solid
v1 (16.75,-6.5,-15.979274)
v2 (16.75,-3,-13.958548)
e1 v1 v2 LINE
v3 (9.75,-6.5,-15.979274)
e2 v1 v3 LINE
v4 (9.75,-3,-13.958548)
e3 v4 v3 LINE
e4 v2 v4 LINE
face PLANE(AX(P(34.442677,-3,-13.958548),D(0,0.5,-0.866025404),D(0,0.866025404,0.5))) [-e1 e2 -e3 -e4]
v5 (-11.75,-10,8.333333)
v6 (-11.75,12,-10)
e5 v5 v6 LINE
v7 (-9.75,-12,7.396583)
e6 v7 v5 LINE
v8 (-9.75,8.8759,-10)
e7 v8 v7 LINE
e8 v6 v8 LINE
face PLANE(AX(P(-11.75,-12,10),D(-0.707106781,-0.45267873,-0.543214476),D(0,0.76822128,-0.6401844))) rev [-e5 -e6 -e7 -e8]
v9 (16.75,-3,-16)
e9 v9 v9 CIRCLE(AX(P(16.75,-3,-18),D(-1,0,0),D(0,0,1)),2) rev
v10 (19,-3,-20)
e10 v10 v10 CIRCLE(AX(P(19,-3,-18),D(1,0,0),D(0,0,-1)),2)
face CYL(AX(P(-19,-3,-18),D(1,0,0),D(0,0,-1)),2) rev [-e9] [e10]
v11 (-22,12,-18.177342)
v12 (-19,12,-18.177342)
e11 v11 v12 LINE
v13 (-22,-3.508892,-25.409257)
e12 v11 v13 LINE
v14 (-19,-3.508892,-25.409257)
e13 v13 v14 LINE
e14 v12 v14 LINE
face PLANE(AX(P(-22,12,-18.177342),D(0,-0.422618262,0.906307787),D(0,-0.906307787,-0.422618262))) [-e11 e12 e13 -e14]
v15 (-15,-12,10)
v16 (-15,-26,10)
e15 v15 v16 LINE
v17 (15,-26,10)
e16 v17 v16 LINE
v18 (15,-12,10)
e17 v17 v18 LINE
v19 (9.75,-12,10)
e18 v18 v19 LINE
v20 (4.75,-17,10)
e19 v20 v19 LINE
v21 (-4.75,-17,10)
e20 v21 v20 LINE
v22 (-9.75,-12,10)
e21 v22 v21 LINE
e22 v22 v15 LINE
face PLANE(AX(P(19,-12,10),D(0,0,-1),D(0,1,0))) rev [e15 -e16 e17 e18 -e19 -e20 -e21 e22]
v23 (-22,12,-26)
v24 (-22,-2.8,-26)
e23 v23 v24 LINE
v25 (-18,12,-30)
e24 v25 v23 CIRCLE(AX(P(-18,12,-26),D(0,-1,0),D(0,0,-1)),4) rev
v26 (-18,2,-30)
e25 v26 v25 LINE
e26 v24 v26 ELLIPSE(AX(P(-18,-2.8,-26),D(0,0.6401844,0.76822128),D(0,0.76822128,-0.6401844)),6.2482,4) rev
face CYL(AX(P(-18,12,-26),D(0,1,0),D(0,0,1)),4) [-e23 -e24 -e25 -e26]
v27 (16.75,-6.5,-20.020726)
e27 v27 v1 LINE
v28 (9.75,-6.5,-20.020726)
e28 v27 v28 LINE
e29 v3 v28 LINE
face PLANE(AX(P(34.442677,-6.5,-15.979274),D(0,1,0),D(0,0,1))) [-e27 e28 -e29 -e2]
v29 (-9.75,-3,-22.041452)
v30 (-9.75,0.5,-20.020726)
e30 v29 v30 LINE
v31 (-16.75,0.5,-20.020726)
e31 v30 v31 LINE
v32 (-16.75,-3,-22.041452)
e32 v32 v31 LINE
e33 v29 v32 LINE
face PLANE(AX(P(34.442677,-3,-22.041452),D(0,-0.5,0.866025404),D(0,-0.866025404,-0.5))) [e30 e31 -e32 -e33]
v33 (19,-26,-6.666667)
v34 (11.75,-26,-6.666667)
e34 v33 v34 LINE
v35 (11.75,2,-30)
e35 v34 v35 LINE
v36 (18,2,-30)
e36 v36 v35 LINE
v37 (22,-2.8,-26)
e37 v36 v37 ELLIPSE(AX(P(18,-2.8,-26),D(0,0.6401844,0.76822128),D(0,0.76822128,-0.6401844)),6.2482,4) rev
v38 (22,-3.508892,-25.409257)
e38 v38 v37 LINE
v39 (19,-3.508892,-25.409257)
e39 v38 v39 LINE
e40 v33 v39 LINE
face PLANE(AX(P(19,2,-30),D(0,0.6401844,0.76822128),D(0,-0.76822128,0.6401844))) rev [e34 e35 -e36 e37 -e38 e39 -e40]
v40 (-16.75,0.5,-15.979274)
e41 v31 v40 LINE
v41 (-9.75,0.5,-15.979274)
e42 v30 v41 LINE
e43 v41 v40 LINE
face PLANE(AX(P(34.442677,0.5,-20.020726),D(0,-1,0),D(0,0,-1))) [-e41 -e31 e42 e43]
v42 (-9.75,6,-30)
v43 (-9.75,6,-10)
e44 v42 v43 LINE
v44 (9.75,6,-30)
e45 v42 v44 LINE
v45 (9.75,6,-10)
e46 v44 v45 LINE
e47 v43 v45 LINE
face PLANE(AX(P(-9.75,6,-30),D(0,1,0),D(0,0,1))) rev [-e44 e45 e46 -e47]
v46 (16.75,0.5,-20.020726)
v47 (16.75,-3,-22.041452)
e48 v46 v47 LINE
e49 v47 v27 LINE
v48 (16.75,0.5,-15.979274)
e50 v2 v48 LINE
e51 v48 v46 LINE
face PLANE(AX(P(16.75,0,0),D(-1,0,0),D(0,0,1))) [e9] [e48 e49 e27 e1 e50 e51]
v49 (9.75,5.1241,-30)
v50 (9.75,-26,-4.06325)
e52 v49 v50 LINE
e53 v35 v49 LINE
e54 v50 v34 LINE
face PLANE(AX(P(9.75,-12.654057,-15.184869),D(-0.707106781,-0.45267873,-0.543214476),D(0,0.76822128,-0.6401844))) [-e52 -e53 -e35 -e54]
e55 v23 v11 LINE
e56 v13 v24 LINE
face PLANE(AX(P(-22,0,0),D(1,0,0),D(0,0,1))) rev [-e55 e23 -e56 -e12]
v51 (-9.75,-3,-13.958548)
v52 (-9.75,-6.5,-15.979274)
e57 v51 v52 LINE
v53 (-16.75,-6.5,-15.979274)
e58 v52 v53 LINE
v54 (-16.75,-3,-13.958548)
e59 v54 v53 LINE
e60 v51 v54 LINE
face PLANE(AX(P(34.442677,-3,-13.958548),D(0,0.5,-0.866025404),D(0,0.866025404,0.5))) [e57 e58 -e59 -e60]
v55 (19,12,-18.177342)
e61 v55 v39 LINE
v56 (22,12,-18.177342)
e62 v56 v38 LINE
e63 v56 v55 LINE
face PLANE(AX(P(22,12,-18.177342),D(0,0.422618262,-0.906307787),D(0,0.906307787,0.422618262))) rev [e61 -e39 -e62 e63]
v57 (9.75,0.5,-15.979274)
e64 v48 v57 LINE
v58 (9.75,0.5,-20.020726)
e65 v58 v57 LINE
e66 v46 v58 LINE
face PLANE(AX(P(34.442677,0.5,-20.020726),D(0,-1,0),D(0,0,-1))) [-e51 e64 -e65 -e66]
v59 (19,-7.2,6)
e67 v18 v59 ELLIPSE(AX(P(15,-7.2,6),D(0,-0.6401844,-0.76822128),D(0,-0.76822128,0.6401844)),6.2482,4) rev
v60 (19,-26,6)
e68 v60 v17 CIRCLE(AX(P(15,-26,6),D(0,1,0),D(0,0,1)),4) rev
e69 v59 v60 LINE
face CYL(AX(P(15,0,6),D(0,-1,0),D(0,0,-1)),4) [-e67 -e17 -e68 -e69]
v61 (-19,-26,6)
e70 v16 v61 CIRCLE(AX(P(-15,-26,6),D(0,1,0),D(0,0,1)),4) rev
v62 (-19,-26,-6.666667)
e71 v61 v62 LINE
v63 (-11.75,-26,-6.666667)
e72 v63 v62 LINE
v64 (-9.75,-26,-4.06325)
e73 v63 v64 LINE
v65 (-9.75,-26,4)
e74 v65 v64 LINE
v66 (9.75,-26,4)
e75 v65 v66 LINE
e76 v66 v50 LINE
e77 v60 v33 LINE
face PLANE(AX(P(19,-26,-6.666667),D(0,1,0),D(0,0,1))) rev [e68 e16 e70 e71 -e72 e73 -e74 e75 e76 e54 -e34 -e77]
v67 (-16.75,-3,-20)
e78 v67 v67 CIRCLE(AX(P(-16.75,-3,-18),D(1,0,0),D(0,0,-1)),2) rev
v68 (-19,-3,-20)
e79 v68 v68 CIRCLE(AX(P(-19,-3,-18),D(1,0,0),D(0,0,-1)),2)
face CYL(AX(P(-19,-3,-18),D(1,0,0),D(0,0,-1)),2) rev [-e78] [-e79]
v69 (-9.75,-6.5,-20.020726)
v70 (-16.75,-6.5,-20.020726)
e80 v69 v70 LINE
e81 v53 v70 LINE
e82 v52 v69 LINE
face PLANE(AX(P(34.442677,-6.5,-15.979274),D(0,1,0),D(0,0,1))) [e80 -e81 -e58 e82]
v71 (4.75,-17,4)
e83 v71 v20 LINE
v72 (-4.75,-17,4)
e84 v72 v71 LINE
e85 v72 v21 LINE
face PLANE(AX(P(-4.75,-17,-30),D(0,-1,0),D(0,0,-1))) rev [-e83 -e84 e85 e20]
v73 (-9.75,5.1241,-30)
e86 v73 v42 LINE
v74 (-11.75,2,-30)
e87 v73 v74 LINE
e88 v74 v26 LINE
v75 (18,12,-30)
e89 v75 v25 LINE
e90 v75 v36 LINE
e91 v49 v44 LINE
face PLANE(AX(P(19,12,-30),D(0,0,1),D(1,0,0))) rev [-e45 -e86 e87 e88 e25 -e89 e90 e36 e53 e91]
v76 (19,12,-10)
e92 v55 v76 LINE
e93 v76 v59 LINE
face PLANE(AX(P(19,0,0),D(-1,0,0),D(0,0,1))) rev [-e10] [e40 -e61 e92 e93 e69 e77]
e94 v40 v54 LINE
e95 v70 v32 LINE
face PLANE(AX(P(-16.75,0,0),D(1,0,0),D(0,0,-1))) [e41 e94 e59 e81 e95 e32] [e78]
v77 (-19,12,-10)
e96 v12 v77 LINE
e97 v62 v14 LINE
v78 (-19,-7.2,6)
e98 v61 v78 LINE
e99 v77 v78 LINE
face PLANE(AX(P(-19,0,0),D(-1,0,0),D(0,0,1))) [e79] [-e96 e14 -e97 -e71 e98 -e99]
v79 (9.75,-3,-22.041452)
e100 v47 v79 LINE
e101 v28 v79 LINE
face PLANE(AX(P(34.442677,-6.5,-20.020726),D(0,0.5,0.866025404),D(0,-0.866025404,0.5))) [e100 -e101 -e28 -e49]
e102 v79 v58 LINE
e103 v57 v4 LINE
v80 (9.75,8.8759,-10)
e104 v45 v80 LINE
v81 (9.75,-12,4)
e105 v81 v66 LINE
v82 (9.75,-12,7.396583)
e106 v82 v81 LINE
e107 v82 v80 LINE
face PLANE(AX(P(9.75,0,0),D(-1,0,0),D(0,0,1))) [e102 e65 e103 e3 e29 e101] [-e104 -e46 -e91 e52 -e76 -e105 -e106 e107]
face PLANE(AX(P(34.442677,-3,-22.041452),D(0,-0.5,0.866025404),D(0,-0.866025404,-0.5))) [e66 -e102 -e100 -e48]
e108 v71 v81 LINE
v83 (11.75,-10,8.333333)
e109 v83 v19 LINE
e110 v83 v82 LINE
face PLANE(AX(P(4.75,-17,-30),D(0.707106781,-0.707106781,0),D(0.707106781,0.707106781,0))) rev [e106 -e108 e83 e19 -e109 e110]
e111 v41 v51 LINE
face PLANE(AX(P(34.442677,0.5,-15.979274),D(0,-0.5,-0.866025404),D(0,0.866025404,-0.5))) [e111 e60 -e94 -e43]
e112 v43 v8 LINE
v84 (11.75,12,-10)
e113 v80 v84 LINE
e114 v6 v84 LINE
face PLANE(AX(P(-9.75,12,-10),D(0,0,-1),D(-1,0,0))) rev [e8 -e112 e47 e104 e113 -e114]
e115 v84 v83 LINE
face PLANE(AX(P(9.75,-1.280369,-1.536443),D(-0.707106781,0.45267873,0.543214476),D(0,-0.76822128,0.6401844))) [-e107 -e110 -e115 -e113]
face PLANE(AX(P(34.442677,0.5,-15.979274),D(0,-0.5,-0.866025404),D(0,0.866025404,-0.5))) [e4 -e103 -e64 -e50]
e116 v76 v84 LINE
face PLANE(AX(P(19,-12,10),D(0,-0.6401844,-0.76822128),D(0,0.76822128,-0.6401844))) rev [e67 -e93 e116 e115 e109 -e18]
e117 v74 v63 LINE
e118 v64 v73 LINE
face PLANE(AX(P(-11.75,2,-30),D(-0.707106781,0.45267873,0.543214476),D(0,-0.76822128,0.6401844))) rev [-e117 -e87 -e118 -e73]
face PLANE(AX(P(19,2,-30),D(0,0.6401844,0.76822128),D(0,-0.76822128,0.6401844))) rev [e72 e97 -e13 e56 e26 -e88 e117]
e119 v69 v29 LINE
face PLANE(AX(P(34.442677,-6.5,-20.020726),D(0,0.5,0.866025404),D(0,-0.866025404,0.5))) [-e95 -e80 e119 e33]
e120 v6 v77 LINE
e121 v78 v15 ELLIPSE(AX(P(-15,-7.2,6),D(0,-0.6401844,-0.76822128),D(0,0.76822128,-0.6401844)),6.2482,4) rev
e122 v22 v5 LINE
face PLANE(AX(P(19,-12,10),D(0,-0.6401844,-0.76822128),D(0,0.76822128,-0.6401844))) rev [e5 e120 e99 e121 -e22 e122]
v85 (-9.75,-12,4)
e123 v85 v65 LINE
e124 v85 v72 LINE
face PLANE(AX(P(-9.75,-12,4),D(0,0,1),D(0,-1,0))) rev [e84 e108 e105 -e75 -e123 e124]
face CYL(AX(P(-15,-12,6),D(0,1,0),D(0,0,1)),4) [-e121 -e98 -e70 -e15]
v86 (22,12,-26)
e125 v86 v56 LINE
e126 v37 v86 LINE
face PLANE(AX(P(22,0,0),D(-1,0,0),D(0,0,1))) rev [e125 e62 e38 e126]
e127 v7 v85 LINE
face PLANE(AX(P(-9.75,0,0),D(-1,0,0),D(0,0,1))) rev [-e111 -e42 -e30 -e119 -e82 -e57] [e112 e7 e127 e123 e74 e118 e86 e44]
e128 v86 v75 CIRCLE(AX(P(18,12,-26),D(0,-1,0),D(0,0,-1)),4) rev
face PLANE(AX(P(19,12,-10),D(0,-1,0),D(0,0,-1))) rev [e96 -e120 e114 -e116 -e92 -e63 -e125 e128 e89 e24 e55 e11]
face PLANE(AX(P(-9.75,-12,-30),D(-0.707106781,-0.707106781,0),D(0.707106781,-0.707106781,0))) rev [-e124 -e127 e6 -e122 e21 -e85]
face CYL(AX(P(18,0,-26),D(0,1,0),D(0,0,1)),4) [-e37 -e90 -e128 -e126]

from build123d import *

# Parameters (mm, degrees)
BOSS_EXTRUDE1_DEPTH = 19
CUT_EXTRUDE1_DEPTH  = 9.75
SKETCH5_R           = 2
CUT_EXTRUDE3_DEPTH  = 55.954526656
BOSS_EXTRUDE3_DEPTH = 3
CUT_EXTRUDE4_DEPTH  = 53.535702146
CUT_EXTRUDE6_START  = -7
CUT_EXTRUDE6_DEPTH  = 33.5
FILLET1_R           = 4
CHAMFER2_SIZE       = 2


with BuildPart() as part:
    # Sketch1 → Boss-Extrude1 (new, symmetric)
    with BuildSketch(Plane(origin=(0, 0, 0), x_dir=(0, 0, -1), z_dir=(1, 0, 0))):
        Polygon((-10, -12), (-10, -26), (6.666666667, -26), (30, 2), (30, 12), (10, 12), align=None)
    extrude(amount=BOSS_EXTRUDE1_DEPTH, both=True)

    # Sketch2 → Cut-Extrude1 (cut, symmetric)
    with BuildSketch(Plane(origin=(0, 0, 0), x_dir=(0, 0, -1), z_dir=(1, 0, 0))):
        Polygon((30, 6), (10, 6), (10, 12), (-4, 12), (-4, 6), (-10, 6), (-10, -12), (-4, -12), (-4, -26), (30, -26), align=None)
    extrude(amount=CUT_EXTRUDE1_DEPTH, both=True, mode=Mode.SUBTRACT)

    # Sketch5 → Cut-Extrude3 (cut, through all)
    with BuildSketch(Plane(origin=(19, 0, 0), x_dir=(0, 0, -1), z_dir=(1, 0, 0))):
        with Locations((18, -3)):
            Circle(SKETCH5_R)
    extrude(amount=-CUT_EXTRUDE3_DEPTH, mode=Mode.SUBTRACT)

    # Sketch6 → Boss-Extrude3 (add)
    with BuildSketch(Plane(origin=(19, 0, 0), x_dir=(0, 0, -1), z_dir=(1, 0, 0))):
        Polygon((18.177341601, 12), (25.409256694, -3.508891967), (30, 2), (30, 12), align=None)
    boss_extrude3 = extrude(amount=BOSS_EXTRUDE3_DEPTH)

    # Sketch7 → Cut-Extrude4 (cut, through all)
    with BuildSketch(Plane.XY.offset(10)):
        Polygon((-9.75, -12), (-4.75, -17), (4.75, -17), (9.75, -12), align=None)
    extrude(amount=-CUT_EXTRUDE4_DEPTH, mode=Mode.SUBTRACT)

    # Mirror2: Boss-Extrude3 across plane
    add(boss_extrude3.mirror(Plane(origin=(0, 0, 0), x_dir=(0, 0, 1), z_dir=(1, 0, 0))))

    # Sketch9 → Cut-Extrude6 (cut)
    with BuildSketch(Plane(origin=(-9.75, 0, 0), x_dir=(0, 0, -1), z_dir=(1, 0, 0)).offset(CUT_EXTRUDE6_START)):
        Polygon((13.958548116, -3), (15.979274058, -6.5), (20.020725942, -6.5), (22.041451884, -3), (20.020725942, 0.5), (15.979274058, 0.5), align=None)
    extrude(amount=CUT_EXTRUDE6_DEPTH, mode=Mode.SUBTRACT)

    # Fillet1
    fillet1_edges = [part.edges().sort_by_distance(p)[0] for p in [
        (22, 7, -30),
        (19, -19, 10),
        (-19, -19, 10),
        (-22, 7, -30),
    ]]
    fillet(fillet1_edges, radius=FILLET1_R)

    # Chamfer2
    # the kernel refuses this chamfer: 2 mm, written as the material it takes off along each edge
    with BuildSketch(Plane(origin=(-9.75, -15.951243191, 13.29270266), x_dir=(-0.9996219169112968, 0.017602431261197007, 0.02112291751343641), z_dir=(0, 0.7682212795973759, -0.6401843996644799))) as chamfer2_piece_1_section:
        Polygon((CHAMFER2_SIZE * 0.999621916911, -CHAMFER2_SIZE * 0.0274958766106), (-CHAMFER2_SIZE * 0.0274958766106, -CHAMFER2_SIZE * 0.999621916911), (0, 0), align=None)
    chamfer2_piece_1 = extrude(amount=41.527730655, mode=Mode.PRIVATE)
    chamfer2_piece_1 = split(chamfer2_piece_1, bisect_by=Plane(origin=(-15.992155631, -5.757844369, -0.703880227), z_dir=(0.7071067811865478, 0.7071067811865474, 0)), keep=Keep.TOP, mode=Mode.PRIVATE)
    chamfer2_piece_1 = split(chamfer2_piece_1, bisect_by=Plane(origin=(-10.414483767, -0.180172505, -10), z_dir=(0, 0, 1)), keep=Keep.TOP, mode=Mode.PRIVATE)
    add(chamfer2_piece_1, mode=Mode.SUBTRACT)
    with BuildSketch(Plane(origin=(-9.75, -29.951243191, -3.373964007), x_dir=(0.02749587661058651, 0.639942356769315, 0.7679308281231783), z_dir=(0, 0.768221279597376, -0.6401843996644798))) as chamfer2_piece_2:
        Polygon((CHAMFER2_SIZE * 0.999621916911, -CHAMFER2_SIZE * 0.0274958766106), (-CHAMFER2_SIZE * 0.0274958766106, -CHAMFER2_SIZE * 0.999621916911), (0, 0), align=None)
    extrude(amount=46.734563773, mode=Mode.SUBTRACT)
    with BuildSketch(Plane(origin=(9.75, -15.951243191, 13.29270266), x_dir=(0.9996219169112968, 0.017602431261197007, 0.02112291751343641), z_dir=(0, 0.7682212795973759, -0.6401843996644799))) as chamfer2_piece_3_section:
        Polygon((CHAMFER2_SIZE * 0.999621916911, CHAMFER2_SIZE * 0.0274958766106), (-CHAMFER2_SIZE * 0.0274958766106, CHAMFER2_SIZE * 0.999621916911), (0, 0), align=None)
    chamfer2_piece_3 = extrude(amount=41.527730655, mode=Mode.PRIVATE)
    chamfer2_piece_3 = split(chamfer2_piece_3, bisect_by=Plane(origin=(15.992155631, -5.757844369, -0.703880227), z_dir=(-0.7071067811865477, 0.7071067811865475, 0)), keep=Keep.TOP, mode=Mode.PRIVATE)
    chamfer2_piece_3 = split(chamfer2_piece_3, bisect_by=Plane(origin=(10.414483767, -0.180172505, -10), z_dir=(0, 0, 1)), keep=Keep.TOP, mode=Mode.PRIVATE)
    add(chamfer2_piece_3, mode=Mode.SUBTRACT)
    with BuildSketch(Plane(origin=(9.75, 5.951243191, -33.29270266), x_dir=(0.9996219169112968, -0.017602431261197003, -0.02112291751343641), z_dir=(0, -0.768221279597376, 0.6401843996644798))) as chamfer2_piece_4:
        Polygon((CHAMFER2_SIZE * 0.999621916911, CHAMFER2_SIZE * 0.0274958766106), (-CHAMFER2_SIZE * 0.0274958766106, CHAMFER2_SIZE * 0.999621916911), (0, 0), align=None)
    extrude(amount=46.734563773, mode=Mode.SUBTRACT)


solid = part.part
